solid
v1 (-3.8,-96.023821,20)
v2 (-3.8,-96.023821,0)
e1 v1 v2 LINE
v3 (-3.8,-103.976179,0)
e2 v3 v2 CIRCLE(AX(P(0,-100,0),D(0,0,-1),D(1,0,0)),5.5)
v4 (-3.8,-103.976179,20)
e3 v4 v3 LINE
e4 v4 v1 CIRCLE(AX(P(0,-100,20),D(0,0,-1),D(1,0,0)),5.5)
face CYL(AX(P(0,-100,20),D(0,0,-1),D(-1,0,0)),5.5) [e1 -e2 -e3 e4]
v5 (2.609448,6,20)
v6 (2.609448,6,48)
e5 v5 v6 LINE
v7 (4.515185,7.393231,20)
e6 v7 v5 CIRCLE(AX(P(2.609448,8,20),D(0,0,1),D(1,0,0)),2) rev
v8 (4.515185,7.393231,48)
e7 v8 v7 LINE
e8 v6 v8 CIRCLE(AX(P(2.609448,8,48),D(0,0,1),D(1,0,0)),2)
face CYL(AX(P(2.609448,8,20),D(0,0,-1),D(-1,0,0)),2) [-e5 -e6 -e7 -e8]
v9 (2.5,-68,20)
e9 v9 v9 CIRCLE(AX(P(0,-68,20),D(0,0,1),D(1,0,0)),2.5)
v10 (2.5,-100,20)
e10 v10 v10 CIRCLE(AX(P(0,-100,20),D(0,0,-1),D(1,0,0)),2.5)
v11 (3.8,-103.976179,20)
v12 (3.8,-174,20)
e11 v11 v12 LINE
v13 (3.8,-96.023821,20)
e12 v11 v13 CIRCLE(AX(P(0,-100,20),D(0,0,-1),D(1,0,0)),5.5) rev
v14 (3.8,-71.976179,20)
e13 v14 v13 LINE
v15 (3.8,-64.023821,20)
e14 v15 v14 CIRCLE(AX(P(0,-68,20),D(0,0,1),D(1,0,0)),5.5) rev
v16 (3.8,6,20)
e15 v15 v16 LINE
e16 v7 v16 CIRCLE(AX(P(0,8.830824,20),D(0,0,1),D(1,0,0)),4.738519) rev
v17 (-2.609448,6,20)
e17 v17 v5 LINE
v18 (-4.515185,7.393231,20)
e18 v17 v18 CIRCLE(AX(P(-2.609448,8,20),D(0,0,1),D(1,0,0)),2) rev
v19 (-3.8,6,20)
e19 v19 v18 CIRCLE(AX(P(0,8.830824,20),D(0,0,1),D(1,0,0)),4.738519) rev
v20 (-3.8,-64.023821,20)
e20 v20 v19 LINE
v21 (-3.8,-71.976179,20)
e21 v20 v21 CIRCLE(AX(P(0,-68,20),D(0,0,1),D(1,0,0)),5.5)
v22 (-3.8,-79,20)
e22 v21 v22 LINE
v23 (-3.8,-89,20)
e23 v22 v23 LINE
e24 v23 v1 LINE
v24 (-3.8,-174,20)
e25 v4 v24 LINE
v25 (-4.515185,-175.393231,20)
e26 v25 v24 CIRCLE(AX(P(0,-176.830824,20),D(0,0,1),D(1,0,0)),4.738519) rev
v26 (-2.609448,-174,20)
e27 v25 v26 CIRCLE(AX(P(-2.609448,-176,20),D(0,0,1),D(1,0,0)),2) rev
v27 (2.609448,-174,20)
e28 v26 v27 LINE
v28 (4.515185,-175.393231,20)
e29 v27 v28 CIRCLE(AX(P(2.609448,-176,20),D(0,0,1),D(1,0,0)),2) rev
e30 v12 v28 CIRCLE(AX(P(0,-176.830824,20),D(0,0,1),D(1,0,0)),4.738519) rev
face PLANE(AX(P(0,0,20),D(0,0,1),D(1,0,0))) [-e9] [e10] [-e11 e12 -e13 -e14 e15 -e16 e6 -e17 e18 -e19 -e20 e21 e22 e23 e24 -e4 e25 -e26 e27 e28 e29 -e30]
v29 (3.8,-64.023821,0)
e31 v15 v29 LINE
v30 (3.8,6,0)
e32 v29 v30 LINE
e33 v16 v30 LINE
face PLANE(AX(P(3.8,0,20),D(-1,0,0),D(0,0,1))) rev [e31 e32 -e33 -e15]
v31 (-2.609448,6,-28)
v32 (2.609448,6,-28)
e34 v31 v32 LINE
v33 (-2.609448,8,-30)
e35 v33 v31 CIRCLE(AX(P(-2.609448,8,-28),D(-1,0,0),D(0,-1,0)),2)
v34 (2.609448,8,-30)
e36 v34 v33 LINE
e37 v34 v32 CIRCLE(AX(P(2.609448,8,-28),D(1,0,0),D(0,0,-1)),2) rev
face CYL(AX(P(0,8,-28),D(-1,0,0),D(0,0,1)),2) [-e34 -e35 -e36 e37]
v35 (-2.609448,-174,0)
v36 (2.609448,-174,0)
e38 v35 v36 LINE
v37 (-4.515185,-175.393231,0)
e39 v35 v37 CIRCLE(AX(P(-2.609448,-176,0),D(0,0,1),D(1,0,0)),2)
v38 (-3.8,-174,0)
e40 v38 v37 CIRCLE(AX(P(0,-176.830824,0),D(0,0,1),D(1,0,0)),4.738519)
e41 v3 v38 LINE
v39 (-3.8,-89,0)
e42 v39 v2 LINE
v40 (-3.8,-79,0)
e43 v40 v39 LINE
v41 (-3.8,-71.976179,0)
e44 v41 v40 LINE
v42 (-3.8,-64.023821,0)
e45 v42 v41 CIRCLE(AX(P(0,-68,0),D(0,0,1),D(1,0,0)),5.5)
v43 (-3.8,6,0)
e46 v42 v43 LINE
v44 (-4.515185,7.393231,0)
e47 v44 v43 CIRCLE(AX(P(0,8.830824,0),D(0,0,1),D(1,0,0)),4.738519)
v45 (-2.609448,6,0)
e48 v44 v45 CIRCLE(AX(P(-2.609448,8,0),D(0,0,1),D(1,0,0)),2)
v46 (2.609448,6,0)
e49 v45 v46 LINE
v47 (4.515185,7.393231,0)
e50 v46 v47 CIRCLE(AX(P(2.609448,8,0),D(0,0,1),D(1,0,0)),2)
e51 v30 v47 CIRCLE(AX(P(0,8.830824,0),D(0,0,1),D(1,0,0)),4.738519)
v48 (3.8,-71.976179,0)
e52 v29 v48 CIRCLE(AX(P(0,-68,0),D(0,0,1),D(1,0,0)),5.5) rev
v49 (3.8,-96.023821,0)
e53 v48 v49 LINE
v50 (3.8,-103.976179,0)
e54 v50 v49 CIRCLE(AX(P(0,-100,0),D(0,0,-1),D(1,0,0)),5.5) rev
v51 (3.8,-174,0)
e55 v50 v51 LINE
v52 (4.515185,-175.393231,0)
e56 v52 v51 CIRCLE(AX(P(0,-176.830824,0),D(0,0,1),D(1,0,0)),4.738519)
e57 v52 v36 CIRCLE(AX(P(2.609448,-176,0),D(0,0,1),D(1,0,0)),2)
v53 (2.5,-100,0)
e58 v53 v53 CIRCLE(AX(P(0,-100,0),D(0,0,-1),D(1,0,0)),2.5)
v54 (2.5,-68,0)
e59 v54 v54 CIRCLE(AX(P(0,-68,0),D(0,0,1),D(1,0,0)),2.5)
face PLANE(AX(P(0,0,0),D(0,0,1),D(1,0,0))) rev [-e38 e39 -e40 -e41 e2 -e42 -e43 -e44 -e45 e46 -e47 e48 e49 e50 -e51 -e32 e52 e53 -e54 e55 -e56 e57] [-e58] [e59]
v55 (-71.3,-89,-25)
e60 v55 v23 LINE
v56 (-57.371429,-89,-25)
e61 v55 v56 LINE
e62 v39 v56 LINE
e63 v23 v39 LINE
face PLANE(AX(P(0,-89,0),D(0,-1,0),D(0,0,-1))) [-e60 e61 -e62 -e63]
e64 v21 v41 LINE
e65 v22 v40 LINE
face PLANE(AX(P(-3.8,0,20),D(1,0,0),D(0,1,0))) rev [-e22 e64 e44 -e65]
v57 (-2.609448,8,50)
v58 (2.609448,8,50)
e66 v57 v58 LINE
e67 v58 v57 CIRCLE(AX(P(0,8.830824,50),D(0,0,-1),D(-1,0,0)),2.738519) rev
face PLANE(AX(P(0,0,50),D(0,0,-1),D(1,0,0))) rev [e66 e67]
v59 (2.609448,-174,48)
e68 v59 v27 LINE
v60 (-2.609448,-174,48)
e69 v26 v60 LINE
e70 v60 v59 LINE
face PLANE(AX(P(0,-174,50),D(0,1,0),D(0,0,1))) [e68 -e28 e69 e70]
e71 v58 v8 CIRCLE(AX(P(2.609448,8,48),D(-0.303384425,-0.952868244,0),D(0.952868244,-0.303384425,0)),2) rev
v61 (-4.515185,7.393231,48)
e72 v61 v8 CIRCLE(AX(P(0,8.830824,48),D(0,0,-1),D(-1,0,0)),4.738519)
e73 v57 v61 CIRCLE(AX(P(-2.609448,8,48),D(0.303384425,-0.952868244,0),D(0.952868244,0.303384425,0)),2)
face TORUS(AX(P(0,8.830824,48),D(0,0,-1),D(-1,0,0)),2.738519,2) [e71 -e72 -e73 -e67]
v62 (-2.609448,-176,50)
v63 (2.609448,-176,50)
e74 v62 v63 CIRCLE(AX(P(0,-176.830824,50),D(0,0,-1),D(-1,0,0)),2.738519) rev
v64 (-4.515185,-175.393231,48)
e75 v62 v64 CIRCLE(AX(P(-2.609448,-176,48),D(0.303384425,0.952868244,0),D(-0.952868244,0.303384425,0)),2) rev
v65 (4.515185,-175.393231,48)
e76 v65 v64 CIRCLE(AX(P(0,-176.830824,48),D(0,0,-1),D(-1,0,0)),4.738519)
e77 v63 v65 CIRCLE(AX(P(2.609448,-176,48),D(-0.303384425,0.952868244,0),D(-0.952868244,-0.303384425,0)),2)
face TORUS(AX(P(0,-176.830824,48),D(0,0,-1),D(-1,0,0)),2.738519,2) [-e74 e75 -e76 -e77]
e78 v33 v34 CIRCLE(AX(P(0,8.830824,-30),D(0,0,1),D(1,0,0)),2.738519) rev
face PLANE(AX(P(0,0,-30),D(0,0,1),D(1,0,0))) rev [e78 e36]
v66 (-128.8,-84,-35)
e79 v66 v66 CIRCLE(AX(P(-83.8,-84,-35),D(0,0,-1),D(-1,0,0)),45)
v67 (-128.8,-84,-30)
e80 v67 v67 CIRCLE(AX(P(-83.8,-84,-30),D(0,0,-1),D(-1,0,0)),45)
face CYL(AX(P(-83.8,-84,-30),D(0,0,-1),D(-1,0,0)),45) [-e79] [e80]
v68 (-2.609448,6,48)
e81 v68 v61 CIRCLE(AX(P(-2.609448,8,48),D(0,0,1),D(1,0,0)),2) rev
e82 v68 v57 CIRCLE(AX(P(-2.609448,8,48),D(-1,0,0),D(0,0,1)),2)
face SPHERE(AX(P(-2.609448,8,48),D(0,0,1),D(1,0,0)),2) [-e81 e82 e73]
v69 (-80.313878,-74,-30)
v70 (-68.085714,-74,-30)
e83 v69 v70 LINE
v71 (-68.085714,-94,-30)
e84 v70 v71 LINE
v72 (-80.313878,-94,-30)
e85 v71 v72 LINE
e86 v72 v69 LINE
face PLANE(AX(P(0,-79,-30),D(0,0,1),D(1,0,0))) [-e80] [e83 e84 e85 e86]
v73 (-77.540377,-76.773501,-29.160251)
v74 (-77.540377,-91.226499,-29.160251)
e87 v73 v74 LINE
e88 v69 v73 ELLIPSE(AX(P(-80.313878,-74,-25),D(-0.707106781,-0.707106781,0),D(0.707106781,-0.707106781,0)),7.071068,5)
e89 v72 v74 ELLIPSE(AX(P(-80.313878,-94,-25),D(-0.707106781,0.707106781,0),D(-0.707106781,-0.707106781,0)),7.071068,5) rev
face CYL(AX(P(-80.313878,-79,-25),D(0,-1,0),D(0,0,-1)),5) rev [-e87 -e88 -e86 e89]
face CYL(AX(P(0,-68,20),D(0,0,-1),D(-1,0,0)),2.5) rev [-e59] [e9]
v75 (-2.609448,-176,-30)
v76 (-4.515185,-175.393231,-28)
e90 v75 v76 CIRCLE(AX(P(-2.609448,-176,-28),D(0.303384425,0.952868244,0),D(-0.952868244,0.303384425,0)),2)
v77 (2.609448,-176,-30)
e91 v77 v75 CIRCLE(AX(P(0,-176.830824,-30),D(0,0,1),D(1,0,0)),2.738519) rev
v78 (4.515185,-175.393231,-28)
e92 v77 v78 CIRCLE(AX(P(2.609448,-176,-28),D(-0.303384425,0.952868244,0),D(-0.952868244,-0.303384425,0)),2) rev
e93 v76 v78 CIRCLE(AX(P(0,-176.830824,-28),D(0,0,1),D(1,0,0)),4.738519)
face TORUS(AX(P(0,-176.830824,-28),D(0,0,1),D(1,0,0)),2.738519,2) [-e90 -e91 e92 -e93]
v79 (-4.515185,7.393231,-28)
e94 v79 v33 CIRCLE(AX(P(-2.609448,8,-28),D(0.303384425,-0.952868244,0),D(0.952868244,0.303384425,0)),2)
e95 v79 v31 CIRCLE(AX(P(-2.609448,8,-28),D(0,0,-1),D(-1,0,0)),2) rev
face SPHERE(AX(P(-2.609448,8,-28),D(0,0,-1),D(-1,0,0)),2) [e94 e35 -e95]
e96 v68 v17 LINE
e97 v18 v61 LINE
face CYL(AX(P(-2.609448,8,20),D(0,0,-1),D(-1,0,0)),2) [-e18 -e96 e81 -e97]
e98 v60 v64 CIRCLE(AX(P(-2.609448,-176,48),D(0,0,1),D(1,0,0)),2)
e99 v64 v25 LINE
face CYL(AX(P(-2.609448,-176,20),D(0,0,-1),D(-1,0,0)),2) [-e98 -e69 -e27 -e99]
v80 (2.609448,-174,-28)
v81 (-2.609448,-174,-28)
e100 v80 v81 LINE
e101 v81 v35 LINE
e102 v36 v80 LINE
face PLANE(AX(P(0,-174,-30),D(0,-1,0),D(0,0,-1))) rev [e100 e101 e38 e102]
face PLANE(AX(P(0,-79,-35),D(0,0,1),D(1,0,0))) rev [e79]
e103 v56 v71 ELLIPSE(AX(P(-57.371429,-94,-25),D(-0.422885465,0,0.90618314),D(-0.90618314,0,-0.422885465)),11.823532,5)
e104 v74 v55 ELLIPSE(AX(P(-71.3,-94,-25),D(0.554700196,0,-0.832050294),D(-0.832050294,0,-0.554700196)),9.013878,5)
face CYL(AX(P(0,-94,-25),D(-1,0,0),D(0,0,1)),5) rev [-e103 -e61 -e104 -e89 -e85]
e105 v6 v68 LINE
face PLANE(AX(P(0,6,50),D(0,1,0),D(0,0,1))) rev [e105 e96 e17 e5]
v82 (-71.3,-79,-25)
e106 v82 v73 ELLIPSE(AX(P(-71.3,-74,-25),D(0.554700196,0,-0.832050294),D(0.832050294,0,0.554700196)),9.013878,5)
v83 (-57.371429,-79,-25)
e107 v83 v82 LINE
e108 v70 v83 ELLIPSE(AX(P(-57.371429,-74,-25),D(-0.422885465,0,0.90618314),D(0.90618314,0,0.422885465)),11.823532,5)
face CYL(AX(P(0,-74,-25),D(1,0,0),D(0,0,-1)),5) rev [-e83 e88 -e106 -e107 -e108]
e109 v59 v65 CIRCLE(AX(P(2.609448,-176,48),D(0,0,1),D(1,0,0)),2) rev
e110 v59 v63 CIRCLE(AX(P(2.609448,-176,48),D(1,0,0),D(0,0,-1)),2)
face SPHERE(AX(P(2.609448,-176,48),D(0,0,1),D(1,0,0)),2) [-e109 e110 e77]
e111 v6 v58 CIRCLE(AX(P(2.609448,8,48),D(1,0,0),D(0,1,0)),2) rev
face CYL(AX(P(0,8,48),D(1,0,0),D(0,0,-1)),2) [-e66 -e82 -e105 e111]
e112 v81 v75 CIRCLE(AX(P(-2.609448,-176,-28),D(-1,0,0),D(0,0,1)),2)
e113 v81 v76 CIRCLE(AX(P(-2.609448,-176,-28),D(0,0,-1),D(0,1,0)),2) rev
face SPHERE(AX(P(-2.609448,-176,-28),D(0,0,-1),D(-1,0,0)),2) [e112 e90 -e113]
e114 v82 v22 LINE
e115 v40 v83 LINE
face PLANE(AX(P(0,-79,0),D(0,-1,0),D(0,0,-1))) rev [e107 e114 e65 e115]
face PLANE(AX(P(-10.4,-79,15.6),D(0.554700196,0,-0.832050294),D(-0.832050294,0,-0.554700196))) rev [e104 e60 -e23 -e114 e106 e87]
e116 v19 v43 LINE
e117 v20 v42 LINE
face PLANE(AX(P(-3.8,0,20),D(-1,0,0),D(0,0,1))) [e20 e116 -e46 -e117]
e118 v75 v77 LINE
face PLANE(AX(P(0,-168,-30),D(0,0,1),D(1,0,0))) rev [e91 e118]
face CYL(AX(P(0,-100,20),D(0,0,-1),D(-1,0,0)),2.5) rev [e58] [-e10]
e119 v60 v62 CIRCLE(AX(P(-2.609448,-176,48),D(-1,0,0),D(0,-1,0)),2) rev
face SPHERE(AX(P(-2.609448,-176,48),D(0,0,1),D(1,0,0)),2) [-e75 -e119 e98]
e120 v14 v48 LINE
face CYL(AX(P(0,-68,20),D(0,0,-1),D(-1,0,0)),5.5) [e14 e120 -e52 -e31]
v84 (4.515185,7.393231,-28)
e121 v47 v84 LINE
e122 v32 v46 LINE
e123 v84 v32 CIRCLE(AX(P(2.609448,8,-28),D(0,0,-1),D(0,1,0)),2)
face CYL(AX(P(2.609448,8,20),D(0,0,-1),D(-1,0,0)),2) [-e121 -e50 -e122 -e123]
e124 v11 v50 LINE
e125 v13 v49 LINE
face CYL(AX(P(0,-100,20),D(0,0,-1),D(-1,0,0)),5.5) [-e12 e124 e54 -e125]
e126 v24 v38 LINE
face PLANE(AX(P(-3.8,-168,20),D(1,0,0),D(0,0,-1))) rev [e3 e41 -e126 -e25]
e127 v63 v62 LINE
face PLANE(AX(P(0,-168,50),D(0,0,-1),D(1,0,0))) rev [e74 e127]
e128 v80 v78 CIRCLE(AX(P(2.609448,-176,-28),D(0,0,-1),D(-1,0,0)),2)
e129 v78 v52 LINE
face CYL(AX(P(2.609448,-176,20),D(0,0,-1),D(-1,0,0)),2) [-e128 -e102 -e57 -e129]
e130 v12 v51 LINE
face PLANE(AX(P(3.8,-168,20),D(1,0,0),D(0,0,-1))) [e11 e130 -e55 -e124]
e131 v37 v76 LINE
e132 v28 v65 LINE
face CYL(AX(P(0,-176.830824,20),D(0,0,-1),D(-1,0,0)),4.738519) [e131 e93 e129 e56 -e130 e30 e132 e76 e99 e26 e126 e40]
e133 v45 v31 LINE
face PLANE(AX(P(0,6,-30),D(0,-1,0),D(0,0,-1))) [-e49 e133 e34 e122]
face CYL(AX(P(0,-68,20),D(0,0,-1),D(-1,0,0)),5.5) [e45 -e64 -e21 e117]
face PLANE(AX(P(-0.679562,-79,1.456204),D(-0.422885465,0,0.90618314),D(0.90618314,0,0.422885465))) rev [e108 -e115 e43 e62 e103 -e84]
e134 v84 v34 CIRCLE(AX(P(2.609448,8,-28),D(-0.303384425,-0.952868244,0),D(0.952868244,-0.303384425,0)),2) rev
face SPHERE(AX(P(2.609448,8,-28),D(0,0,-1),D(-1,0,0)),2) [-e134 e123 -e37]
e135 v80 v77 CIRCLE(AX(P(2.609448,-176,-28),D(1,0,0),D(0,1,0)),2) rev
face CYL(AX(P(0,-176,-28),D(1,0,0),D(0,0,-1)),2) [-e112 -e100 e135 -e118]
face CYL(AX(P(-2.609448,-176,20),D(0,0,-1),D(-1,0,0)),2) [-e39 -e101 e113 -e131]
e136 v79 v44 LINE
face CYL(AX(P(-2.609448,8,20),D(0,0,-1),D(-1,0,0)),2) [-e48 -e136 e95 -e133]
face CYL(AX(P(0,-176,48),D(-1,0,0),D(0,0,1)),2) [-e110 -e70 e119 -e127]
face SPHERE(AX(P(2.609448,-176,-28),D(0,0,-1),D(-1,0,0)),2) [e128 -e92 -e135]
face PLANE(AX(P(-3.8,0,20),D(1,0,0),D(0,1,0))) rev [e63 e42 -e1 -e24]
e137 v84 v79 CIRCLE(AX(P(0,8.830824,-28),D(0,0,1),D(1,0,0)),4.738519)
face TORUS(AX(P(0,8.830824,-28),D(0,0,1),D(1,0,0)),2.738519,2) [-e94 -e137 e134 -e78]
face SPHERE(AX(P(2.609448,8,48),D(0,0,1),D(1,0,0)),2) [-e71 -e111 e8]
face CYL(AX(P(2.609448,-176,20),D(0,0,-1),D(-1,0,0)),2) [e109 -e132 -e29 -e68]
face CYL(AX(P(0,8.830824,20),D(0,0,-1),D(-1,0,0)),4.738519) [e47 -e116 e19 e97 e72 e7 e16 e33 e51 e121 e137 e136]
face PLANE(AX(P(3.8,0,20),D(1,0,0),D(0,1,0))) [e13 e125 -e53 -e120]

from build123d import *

# Parameters (mm, degrees)
SKETCH1_R                = 2.5000000000000036
BOSS_EXTRUDE1_DEPTH      = 20
BOSS_EXTRUDE3_START      = -30
BOSS_EXTRUDE3_DEPTH      = 30
FILLET1_R                = 2
FILLET1_OF_MIRROR2_R     = 2
BOSS_EXTRUDE5_DEPTH      = 5
BOSS_EXTRUDE5_DEPTH_BACK = 5
SKETCH10_W               = 5
SKETCH10_H               = 4.9999999999999964
SKETCH11_R               = 44.99999999999999
BOSS_EXTRUDE6_DEPTH      = 5
FILLET2_R                = 5


# Read off the part's stored shape, not the designer's step: Mirror3
with BuildPart() as part:
    # Sketch1 → Boss-Extrude1 (new body)
    with BuildSketch(Plane.XY):
        with BuildLine():
            Line((-3.7999999999999994, 5.999999999999999), (-3.799999999999992, -64.0238209295858))
            ThreePointArc((-3.800000000000015, -64.0238209295858), (-5.499999999999996, -67.99999999999999), (-3.8000000000000083, -71.97617907041419))
            Line((-3.799999999999991, -71.97617907041419), (-3.7999999999999896, -83.99999999999999))
            Line((-3.799999999999989, -83.99999999999999), (3.800000000000014, -83.99999999999999))
            Line((3.800000000000014, -83.99999999999999), (3.8000000000000123, -71.97617907041419))
            ThreePointArc((3.8000000000000083, -71.97617907041419), (5.499999999999996, -67.99999999999999), (3.800000000000015, -64.0238209295858))
            Line((3.800000000000011, -64.0238209295858), (3.7999999999999994, 6))
            ThreePointArc((3.800000000000001, 5.999999999999998), (0, 13.569343394379079), (-3.8000000000000016, 5.999999999999998))
        make_face()
        with Locations((0, -67.99999999999999)):
            Circle(SKETCH1_R, mode=Mode.SUBTRACT)
    extrude(amount=BOSS_EXTRUDE1_DEPTH)

    # Sketch5 → Boss-Extrude3 (add)
    with BuildSketch(Plane.XY.offset(BOSS_EXTRUDE3_START)):
        with BuildLine():
            ThreePointArc((4.738519293185978, 8.8308241011931), (-1.4911726556286193, 13.328597906421773), (-3.800000000000001, 5.999999999999998))
            Line((-3.8000000000000007, 5.999999999999998), (3.8000000000000007, 5.999999999999998))
            ThreePointArc((3.800000000000001, 5.999999999999999), (4.497773805228675, 7.339651445564482), (4.738519293185978, 8.830824101193098))
        make_face()
    boss_extrude3 = extrude(amount=BOSS_EXTRUDE3_DEPTH)

    # Fillet1
    fillet1_edges = [part.edges().sort_by_distance(p)[0] for p in [
        (0, 5.999999999999998, -30),
        (3.800000000000001, 5.999999999999998, -15),
        (4.44e-15, 13.569343394379077, -30),
        (-3.8000000000000016, 5.999999999999998, -15),
    ]]
    fillet(fillet1_edges, radius=FILLET1_R)

    # Mirror2: Boss-Extrude3 across plane
    add(boss_extrude3.mirror(Plane(origin=(0, 0, 10), x_dir=(1, 0, 0), z_dir=(0, 0, -1))))

    # Fillet1 of Mirror2
    fillet1_of_mirror2_edges = [part.edges().sort_by_distance(p)[0] for p in [
        (0, 5.999999999999998, 50),
        (3.800000000000001, 5.999999999999998, 35),
        (4.44e-15, 13.569343394379077, 50),
        (-3.8000000000000016, 5.999999999999998, 35),
    ]]
    fillet(fillet1_of_mirror2_edges, radius=FILLET1_OF_MIRROR2_R)

    # Mirror3: part across plane


with BuildPart() as part_1:
    add(part.part)
    add(part.part.mirror(Plane(origin=(0, -83.99999999999999, 20), x_dir=(0, 0, 1), z_dir=(0, -1, 0))))

    # Sketch10 → Boss-Extrude5 (add, two sides: drawn at the far end of the back side and taken through both)
    with BuildSketch(Plane(origin=(0, -83.99999999999999, 0), x_dir=(-1, 0, 0), z_dir=(0, -1, 0)).offset(-BOSS_EXTRUDE5_DEPTH_BACK)):
        Polygon((3.799999999999991, -20), (3.8000000000000007, 0), (78.79999999999998, 35.00000000000001), (78.79999999999998, 30.00000000000001), align=None)
        with Locations((81.29999999999998, 32.50000000000001)):
            Rectangle(SKETCH10_W, SKETCH10_H)
    extrude(amount=BOSS_EXTRUDE5_DEPTH + BOSS_EXTRUDE5_DEPTH_BACK)

    # Sketch11 → Boss-Extrude6 (add)
    with BuildSketch(Plane(origin=(0, 0, -35.00000000000001), x_dir=(-1, 0, 0), z_dir=(0, 0, -1))):
        with Locations((83.79999999999998, -83.99999999999999)):
            Circle(SKETCH11_R)
    extrude(amount=-BOSS_EXTRUDE6_DEPTH)

    # Fillet2
    fillet2_edges = [part_1.edges().sort_by_distance(p)[0] for p in [
        (-78.79999999999998, -83.99999999999999, -30.00000000000001),
        (-73.44285714285712, -88.99999999999999, -30.000000000000007),
        (-73.44285714285712, -78.99999999999999, -30.000000000000007),
    ]]
    fillet(fillet2_edges, radius=FILLET2_R)


solid = part_1.part
